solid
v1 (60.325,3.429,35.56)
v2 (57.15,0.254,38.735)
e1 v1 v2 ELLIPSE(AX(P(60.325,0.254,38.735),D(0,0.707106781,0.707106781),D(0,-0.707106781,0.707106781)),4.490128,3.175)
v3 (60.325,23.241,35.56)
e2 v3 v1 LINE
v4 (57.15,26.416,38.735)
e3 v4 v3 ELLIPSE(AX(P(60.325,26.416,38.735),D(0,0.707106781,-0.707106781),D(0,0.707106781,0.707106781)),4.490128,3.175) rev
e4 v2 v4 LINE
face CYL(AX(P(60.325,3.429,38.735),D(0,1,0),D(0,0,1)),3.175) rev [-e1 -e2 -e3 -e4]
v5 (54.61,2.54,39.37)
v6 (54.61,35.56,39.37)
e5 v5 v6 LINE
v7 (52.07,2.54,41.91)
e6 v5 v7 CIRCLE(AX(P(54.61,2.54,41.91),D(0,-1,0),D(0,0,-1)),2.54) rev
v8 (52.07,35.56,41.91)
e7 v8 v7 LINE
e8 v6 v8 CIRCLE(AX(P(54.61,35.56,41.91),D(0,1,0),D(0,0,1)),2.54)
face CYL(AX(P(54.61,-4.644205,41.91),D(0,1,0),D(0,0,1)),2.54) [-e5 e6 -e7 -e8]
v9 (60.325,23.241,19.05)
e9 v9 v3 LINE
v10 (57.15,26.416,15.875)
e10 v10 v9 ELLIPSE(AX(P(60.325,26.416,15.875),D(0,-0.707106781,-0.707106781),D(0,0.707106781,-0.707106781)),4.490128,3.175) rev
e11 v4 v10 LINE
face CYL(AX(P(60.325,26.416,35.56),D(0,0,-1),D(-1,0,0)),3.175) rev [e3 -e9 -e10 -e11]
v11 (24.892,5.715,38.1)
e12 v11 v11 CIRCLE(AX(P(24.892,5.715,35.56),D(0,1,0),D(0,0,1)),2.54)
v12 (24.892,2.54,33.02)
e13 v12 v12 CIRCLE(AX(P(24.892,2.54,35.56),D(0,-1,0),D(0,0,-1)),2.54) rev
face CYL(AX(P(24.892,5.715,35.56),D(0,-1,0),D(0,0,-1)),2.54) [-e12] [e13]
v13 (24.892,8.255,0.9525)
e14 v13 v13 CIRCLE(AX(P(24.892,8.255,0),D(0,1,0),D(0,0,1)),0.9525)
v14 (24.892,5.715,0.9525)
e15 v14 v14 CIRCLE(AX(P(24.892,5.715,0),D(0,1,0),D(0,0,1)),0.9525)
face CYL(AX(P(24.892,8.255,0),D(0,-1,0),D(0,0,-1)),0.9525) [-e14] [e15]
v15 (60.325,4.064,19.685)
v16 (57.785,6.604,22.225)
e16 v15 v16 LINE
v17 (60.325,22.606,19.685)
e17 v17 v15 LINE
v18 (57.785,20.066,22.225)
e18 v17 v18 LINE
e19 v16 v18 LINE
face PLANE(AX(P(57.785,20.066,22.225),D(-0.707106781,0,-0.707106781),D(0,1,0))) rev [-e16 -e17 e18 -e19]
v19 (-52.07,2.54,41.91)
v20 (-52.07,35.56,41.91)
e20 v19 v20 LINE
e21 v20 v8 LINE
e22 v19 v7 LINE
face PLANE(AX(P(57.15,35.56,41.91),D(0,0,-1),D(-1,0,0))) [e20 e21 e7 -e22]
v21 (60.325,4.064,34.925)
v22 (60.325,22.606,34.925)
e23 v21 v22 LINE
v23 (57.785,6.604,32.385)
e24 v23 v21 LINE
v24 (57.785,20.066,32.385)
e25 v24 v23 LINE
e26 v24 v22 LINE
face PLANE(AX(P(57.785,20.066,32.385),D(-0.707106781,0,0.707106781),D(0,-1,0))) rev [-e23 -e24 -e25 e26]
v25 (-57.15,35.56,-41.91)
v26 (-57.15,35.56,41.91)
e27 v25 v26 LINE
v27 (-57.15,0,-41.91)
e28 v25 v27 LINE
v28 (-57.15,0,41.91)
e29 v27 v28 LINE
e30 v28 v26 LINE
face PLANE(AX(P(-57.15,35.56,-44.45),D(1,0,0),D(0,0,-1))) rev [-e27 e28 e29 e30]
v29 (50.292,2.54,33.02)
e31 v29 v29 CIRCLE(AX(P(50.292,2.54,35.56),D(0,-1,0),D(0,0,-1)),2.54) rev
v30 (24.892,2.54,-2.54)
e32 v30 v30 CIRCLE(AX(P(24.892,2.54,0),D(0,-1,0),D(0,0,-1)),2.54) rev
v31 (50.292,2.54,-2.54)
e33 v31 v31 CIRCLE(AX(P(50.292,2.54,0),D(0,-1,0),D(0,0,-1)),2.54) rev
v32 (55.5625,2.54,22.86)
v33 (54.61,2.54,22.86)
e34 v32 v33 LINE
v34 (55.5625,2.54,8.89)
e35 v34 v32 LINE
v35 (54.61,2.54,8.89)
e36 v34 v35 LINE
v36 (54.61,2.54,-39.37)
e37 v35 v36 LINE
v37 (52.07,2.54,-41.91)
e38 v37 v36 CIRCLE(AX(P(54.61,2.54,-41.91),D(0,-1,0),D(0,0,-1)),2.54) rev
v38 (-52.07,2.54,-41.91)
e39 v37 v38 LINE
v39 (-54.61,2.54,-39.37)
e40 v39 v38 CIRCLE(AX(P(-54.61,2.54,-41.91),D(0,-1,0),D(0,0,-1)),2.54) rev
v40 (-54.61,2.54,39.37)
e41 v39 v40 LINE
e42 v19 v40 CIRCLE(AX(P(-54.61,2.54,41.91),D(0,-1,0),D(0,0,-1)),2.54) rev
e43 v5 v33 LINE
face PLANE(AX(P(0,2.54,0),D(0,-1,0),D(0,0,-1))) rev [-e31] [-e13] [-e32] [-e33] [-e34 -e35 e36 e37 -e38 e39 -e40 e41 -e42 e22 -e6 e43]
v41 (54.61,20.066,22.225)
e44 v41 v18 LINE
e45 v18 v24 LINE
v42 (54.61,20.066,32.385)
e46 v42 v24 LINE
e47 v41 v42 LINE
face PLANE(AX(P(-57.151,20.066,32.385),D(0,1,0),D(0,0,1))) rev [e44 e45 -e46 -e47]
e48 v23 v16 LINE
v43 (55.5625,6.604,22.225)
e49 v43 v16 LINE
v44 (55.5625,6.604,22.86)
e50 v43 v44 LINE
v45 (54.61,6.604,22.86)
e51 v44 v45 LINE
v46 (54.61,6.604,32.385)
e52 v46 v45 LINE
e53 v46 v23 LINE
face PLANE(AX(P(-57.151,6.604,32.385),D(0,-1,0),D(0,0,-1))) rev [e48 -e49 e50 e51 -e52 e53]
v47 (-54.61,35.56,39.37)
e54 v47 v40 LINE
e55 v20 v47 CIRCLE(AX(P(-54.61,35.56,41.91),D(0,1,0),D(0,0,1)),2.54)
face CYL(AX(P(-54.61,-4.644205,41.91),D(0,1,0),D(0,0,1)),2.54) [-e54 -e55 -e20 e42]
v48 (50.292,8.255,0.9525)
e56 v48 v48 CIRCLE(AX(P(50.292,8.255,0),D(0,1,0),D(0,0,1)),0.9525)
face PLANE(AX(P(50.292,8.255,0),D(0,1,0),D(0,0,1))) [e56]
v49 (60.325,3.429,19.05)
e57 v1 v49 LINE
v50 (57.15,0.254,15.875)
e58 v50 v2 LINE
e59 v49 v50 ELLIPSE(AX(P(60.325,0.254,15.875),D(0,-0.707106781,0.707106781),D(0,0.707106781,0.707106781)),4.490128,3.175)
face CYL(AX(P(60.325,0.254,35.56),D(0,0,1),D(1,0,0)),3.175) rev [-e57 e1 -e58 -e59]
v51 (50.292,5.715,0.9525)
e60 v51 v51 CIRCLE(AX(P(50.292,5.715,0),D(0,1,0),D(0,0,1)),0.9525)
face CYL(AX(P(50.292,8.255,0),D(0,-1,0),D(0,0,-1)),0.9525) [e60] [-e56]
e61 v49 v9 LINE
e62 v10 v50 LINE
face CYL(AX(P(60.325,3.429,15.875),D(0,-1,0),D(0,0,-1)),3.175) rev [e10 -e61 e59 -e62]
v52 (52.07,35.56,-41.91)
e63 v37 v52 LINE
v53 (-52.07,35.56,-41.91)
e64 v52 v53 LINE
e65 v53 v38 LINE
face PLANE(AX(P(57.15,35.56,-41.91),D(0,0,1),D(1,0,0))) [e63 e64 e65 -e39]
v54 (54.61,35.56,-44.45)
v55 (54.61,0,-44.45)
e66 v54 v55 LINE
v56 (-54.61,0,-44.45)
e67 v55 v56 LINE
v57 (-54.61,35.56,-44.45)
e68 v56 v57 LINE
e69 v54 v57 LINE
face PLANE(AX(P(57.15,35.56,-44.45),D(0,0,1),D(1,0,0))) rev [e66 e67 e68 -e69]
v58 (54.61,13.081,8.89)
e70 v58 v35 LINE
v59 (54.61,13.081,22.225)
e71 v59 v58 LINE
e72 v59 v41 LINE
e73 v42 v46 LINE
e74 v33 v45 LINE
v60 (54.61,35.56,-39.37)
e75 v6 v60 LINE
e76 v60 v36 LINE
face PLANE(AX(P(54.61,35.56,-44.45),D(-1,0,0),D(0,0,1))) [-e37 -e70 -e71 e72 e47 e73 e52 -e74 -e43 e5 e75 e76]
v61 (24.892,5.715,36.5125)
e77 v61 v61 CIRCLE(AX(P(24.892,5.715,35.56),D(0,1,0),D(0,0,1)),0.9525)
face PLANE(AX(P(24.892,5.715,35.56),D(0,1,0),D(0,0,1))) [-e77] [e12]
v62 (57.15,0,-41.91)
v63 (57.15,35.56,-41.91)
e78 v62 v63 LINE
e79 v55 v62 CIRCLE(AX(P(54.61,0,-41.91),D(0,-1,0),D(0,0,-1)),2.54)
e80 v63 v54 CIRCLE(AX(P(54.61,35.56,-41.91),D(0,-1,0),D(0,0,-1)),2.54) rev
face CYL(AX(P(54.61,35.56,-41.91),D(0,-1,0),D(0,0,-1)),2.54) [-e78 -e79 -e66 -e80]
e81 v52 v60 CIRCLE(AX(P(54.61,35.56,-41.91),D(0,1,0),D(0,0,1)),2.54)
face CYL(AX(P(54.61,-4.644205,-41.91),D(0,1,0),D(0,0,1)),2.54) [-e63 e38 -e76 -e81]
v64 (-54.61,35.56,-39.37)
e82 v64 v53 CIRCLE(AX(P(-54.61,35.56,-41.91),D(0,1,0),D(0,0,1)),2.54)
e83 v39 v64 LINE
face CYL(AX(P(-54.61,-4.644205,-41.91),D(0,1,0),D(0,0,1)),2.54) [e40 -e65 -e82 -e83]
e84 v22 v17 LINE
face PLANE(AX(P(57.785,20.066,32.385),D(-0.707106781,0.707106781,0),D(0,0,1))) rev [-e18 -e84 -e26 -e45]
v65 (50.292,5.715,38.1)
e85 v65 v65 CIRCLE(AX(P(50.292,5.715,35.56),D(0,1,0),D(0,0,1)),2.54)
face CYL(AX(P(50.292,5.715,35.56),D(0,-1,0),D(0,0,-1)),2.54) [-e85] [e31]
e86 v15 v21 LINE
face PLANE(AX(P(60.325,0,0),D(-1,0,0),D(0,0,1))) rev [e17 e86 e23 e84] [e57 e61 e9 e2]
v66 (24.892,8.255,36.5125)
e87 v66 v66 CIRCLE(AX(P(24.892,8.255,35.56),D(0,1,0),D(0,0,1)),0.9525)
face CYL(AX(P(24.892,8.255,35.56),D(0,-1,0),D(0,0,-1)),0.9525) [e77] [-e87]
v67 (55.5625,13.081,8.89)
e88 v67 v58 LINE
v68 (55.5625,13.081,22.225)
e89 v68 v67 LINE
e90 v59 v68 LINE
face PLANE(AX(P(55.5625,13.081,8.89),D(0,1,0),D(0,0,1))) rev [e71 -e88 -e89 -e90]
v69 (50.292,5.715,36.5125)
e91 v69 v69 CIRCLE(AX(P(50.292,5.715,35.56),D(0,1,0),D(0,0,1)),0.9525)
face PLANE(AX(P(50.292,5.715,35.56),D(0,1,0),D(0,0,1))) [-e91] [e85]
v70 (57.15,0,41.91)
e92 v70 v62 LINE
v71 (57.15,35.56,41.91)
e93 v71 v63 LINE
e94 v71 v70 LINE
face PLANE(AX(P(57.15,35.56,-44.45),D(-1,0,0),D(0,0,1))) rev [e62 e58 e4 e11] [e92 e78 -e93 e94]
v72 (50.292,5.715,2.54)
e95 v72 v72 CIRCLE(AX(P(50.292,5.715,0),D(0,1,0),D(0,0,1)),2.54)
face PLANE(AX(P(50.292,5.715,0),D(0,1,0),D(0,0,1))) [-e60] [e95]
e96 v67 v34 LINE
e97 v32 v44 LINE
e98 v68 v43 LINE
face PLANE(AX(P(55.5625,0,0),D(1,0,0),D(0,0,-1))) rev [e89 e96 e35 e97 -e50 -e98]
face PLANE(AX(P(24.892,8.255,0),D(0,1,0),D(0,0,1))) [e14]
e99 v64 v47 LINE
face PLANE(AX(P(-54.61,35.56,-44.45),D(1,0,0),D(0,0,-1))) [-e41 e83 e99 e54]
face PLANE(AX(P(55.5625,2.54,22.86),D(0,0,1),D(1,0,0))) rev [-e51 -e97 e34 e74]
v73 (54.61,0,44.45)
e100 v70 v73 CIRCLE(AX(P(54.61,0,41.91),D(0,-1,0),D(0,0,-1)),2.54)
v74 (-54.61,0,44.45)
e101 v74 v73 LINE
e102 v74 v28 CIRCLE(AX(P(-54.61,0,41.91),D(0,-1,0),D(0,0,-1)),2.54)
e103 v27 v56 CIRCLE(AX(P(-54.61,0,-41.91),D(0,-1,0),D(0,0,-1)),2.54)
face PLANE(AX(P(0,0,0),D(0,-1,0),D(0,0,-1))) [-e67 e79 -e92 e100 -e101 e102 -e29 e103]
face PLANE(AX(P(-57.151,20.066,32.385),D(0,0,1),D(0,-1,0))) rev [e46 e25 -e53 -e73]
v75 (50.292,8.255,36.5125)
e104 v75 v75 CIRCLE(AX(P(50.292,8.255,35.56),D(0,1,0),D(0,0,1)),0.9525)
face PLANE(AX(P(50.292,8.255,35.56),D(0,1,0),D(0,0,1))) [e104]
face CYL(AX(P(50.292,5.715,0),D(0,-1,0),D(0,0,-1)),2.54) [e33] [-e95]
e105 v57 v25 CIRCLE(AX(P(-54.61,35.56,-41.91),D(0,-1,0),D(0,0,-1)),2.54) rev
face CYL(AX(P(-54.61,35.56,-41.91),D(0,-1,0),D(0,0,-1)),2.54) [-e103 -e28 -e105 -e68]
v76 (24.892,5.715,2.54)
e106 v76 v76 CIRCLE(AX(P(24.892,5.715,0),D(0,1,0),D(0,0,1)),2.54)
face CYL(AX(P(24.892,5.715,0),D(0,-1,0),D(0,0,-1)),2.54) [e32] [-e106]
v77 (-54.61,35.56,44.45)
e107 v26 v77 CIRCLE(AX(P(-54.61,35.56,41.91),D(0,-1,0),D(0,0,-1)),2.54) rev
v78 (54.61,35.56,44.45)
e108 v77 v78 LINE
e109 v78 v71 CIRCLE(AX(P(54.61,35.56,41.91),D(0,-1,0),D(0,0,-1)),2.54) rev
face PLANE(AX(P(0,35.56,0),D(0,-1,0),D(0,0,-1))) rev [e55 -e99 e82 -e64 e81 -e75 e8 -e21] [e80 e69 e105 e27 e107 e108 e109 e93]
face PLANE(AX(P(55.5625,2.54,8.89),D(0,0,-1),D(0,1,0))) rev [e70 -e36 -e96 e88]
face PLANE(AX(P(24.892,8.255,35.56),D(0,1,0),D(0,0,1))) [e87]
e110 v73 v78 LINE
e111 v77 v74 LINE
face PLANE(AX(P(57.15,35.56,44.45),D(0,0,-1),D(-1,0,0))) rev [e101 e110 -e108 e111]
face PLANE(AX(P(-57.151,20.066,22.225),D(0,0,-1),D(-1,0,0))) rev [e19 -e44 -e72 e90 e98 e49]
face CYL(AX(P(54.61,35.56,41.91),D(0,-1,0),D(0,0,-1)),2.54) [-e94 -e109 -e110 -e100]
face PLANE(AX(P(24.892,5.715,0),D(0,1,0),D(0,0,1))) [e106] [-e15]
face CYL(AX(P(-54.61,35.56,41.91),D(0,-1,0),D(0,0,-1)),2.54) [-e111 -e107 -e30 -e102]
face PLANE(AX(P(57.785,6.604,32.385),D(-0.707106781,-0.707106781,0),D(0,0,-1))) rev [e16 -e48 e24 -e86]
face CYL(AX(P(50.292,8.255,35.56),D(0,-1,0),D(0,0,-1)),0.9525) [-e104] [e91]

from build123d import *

# Parameters (mm, degrees)
SKETCH1_W           = 114.3
SKETCH1_H           = 88.9
BOSS_EXTRUDE1_DEPTH = 35.56
SHELL1_T            = -2.54
FILLET1_R           = 2.54
SKETCH2_R           = 2.54
BOSS_EXTRUDE2_DEPTH = 33.02
SKETCH4_W           = 13.97
SKETCH4_H           = 10.541
CUT_EXTRUDE2_DEPTH  = 0.9525
SKETCH5_R           = 2.54
BOSS_EXTRUDE3_DEPTH = 3.175
SKETCH6_R           = 0.9525
BOSS_EXTRUDE4_DEPTH = 2.54
CUT_EXTRUDE3_REACH  = 129.69
SKETCH7_W           = 10.16
SKETCH7_H           = 13.462
SKETCH8_W           = 16.51
SKETCH8_H           = 19.812
SKETCH8_W_2         = 10.16
SKETCH8_H_2         = 13.462
BOSS_EXTRUDE5_DEPTH = 3.175
CHAMFER1_SIZE       = 2.54
FILLET2_R           = 3.175


with BuildPart() as part:
    # Sketch1 → Boss-Extrude1 (new body)
    with BuildSketch(Plane(origin=(0, 0, 0), x_dir=(1, 0, 0), z_dir=(0, 1, 0))):
        Rectangle(SKETCH1_W, SKETCH1_H)
    extrude(amount=BOSS_EXTRUDE1_DEPTH)

    # Shell1
    shell1_openings = [part.faces().sort_by_distance(p)[0] for p in [
        (0, 35.56, 0),
    ]]
    offset(amount=SHELL1_T, openings=shell1_openings, kind=Kind.INTERSECTION)

    # Fillet1
    fillet1_edges = [part.edges().sort_by_distance(p)[0] for p in [
        (-54.61, 19.05, -41.91),
        (-54.61, 19.05, 41.91),
        (54.61, 19.05, 41.91),
        (54.61, 19.05, -41.91),
        (-57.15, 17.78, -44.45),
        (57.15, 17.78, -44.45),
        (57.15, 17.78, 44.45),
        (-57.15, 17.78, 44.45),
    ]]
    fillet(fillet1_edges, radius=FILLET1_R)

    # Sketch2 → Boss-Extrude2 (add)
    with BuildSketch(Plane(origin=(0, 35.56, 0), x_dir=(1, 0, 0), z_dir=(0, 1, 0))):
        with Locations((-54.61, 41.91)):
            Circle(SKETCH2_R)
        with Locations((54.61, 41.91)):
            Circle(SKETCH2_R)
        with Locations((54.61, -41.91)):
            Circle(SKETCH2_R)
        with Locations((-54.61, -41.91)):
            Circle(SKETCH2_R)
    extrude(amount=-BOSS_EXTRUDE2_DEPTH)

    # Sketch4 → Cut-Extrude2 (cut)
    with BuildSketch(Plane.ZY.offset(-54.61)):
        with Locations((15.875, 7.8105)):
            Rectangle(SKETCH4_W, SKETCH4_H)
    extrude(amount=-CUT_EXTRUDE2_DEPTH, mode=Mode.SUBTRACT)

    # Sketch5 → Boss-Extrude3 (add)
    with BuildSketch(Plane(origin=(0, 2.54, 0), x_dir=(1, 0, 0), z_dir=(0, 1, 0))):
        with Locations(Location((24.892, 0, 0), (0, 0, 90))):
            Circle(SKETCH5_R)
        with Locations(Location((50.292, 0, 0), (0, 0, 90))):
            Circle(SKETCH5_R)
        with Locations(Location((24.892, -35.56, 0), (0, 0, 90))):
            Circle(SKETCH5_R)
        with Locations(Location((50.292, -35.56, 0), (0, 0, 90))):
            Circle(SKETCH5_R)
    extrude(amount=BOSS_EXTRUDE3_DEPTH)

    # Sketch6 → Boss-Extrude4 (add)
    with BuildSketch(Plane(origin=(0, 5.715, 0), x_dir=(1, 0, 0), z_dir=(0, 1, 0))):
        with Locations(Location((24.892, 0, 0), (0, 0, 270))):
            Circle(SKETCH6_R)
        with Locations(Location((50.292, 0, 0), (0, 0, 270))):
            Circle(SKETCH6_R)
        with Locations(Location((50.292, -35.56, 0), (0, 0, 270))):
            Circle(SKETCH6_R)
        with Locations(Location((24.892, -35.56, 0), (0, 0, 270))):
            Circle(SKETCH6_R)
    extrude(amount=BOSS_EXTRUDE4_DEPTH)

    # Sketch7 → Cut-Extrude3 (cut, up to next)
    with BuildSketch(Plane(origin=(57.15, 0, 0), x_dir=(0, 0, -1), z_dir=(1, 0, 0)), mode=Mode.PRIVATE) as cut_extrude3_sk1:
        with Locations((-27.305, 13.335)):
            Rectangle(SKETCH7_W, SKETCH7_H)
    cut_extrude3_tool1 = extrude(cut_extrude3_sk1.sketch, amount=-CUT_EXTRUDE3_REACH, mode=Mode.PRIVATE) & part.part
    add(cut_extrude3_tool1.solids().sort_by_distance((57.15, 13.335, 27.305))[0], mode=Mode.SUBTRACT)

    # Sketch8 → Boss-Extrude5 (add)
    with BuildSketch(Plane(origin=(57.15, 0, 0), x_dir=(0, 0, -1), z_dir=(1, 0, 0))):
        with Locations((-27.305, 13.335)):
            Rectangle(SKETCH8_W, SKETCH8_H)
        with Locations((-27.305, 13.335)):
            Rectangle(SKETCH8_W_2, SKETCH8_H_2, mode=Mode.SUBTRACT)
    extrude(amount=BOSS_EXTRUDE5_DEPTH)

    # Chamfer1
    chamfer1_edges = [part.edges().sort_by_distance(p)[0] for p in [
        (60.325, 13.335, 32.385),
        (60.325, 6.604, 27.305),
        (60.325, 13.335, 22.225),
        (60.325, 20.066, 27.305),
    ]]
    chamfer(chamfer1_edges, length=CHAMFER1_SIZE)

    # Fillet2
    fillet2_edges = [part.edges().sort_by_distance(p)[0] for p in [
        (57.15, 3.429, 27.305),
        (57.15, 13.335, 19.05),
        (57.15, 23.241, 27.305),
        (57.15, 13.335, 35.56),
    ]]
    fillet(fillet2_edges, radius=FILLET2_R - 0.0001)  # a hair under: the kernel refuses the full size


solid = part.part
